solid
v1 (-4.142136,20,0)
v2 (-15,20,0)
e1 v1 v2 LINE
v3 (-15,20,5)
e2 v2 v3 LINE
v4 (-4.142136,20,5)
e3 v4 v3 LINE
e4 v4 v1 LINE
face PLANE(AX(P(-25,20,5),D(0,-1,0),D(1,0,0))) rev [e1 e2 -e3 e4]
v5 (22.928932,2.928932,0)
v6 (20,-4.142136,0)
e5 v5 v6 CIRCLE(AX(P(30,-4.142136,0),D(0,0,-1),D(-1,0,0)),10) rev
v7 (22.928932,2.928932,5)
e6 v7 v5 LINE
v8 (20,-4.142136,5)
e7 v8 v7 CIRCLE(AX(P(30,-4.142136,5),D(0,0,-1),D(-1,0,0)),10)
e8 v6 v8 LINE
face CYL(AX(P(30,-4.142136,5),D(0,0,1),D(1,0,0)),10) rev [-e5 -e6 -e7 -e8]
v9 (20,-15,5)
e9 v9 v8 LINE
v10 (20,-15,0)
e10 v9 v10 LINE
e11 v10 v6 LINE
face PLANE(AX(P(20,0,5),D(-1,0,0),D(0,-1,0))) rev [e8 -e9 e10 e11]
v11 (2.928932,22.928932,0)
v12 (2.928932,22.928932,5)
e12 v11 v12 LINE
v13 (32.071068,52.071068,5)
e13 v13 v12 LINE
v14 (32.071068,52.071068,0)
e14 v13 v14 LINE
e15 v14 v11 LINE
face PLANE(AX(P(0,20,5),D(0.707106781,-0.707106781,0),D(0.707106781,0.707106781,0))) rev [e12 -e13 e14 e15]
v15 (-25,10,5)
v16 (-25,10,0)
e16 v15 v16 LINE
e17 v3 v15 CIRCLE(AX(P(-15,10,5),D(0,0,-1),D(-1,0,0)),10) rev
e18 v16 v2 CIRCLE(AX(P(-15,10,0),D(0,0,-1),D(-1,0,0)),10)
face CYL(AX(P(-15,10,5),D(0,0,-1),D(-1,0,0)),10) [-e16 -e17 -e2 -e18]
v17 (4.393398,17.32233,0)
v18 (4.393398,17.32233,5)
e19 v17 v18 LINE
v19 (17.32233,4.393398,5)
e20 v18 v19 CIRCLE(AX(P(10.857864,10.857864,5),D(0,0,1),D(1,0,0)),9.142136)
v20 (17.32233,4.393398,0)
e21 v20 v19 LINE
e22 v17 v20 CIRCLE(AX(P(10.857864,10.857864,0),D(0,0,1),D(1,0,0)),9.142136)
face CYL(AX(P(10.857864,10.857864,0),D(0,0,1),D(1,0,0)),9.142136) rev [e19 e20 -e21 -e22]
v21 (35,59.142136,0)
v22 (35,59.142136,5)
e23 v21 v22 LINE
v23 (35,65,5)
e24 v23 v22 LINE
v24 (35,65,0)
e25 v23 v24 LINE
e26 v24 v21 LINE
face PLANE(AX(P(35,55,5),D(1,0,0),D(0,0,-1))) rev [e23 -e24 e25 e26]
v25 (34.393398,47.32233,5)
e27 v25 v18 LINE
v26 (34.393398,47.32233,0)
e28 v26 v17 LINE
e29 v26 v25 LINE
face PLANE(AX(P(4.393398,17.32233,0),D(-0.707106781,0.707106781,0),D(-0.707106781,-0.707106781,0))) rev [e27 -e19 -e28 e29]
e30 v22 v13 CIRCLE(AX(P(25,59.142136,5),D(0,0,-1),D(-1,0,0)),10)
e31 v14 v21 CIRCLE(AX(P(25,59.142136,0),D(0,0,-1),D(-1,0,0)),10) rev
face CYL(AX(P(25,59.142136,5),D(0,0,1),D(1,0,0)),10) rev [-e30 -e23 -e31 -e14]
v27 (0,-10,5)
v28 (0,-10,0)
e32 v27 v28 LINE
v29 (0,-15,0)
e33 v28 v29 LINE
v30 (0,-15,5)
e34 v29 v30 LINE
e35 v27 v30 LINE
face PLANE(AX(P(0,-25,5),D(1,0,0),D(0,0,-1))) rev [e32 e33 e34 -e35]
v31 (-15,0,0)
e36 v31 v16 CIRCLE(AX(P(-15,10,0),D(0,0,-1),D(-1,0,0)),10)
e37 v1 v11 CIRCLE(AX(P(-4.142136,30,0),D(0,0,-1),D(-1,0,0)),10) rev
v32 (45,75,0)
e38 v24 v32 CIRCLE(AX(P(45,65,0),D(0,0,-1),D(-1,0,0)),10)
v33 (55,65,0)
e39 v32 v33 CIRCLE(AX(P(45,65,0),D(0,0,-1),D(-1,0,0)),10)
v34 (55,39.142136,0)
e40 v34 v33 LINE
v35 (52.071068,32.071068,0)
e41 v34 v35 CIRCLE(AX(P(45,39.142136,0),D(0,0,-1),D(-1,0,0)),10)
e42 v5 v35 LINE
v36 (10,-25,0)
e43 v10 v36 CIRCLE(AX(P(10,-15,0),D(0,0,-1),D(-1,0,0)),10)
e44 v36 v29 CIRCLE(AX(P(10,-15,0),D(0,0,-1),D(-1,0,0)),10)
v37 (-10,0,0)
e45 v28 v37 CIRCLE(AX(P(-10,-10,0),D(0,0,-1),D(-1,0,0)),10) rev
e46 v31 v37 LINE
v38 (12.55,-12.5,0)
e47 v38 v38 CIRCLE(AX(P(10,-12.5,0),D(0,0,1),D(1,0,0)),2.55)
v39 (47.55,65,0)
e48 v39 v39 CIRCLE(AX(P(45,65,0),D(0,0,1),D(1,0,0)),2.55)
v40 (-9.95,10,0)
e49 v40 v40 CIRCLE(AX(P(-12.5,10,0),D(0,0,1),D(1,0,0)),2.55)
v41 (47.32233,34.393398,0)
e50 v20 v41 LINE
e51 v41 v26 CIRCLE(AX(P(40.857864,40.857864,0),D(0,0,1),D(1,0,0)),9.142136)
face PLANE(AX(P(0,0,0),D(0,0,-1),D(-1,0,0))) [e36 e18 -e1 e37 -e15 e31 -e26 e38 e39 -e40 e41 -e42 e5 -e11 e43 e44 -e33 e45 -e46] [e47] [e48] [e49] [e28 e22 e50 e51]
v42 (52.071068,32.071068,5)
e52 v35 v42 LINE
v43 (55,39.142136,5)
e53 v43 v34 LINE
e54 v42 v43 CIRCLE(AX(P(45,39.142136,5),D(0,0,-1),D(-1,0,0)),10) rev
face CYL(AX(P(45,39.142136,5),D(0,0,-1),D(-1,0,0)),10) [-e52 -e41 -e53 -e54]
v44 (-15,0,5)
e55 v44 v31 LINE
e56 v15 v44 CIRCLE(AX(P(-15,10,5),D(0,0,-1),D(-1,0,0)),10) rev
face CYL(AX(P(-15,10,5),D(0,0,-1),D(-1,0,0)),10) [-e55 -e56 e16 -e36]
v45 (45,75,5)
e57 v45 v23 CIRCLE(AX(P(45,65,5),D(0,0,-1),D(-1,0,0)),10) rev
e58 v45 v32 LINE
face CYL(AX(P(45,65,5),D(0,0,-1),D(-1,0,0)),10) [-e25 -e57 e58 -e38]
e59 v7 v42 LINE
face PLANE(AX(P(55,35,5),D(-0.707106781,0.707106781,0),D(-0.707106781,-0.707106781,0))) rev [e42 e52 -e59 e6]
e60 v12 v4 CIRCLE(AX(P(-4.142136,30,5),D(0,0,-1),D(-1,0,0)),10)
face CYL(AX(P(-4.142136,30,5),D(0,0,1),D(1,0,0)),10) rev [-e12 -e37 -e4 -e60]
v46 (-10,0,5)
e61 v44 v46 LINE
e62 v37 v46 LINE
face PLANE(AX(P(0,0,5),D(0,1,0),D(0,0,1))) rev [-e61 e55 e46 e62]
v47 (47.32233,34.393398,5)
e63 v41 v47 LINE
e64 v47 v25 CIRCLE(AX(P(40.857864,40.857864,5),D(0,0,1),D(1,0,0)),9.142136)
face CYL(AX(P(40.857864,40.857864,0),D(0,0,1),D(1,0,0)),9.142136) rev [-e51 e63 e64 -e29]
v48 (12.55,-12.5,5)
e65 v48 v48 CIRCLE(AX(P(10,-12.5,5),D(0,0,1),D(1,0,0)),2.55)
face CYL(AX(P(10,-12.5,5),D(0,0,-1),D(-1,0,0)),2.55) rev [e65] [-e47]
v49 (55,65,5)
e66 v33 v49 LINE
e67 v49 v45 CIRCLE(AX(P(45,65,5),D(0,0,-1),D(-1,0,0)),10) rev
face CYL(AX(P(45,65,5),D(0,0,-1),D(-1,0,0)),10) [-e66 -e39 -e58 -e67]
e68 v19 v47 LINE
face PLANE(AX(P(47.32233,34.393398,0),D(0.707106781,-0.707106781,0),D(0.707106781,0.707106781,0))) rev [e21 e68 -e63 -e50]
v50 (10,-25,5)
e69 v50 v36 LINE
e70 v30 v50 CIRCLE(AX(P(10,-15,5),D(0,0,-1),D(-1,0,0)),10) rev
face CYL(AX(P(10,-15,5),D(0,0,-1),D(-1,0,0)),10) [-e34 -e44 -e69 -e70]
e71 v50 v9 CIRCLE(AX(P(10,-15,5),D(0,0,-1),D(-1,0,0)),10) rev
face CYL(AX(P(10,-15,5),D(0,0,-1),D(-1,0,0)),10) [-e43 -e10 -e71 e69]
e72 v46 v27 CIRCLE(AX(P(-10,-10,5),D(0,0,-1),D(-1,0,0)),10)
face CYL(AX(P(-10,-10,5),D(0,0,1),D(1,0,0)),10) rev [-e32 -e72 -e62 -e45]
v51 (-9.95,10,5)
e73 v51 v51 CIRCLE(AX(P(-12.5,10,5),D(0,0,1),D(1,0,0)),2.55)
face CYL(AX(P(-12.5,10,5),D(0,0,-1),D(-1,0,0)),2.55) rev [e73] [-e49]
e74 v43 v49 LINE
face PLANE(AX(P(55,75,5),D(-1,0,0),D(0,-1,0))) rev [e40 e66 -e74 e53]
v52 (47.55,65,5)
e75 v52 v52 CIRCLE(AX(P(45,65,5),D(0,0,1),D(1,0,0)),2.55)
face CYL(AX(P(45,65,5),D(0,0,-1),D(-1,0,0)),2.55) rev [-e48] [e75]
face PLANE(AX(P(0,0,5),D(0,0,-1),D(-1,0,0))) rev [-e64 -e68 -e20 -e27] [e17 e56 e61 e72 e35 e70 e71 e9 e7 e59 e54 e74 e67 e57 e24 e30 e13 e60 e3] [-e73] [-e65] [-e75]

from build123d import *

# Parameters (mm, degrees)
SKETCH_1_R          = 2.55
EXTRUDE_1_DEPTH     = 5
FILLET_1_R          = 10
CUT_EXTRUDE_1_DEPTH = 94.139680051


with BuildPart() as part:
    # ｽｹｯﾁ1 → ﾎﾞｽ - 押し出し1 (new body)
    with BuildSketch(Plane.XY):
        Polygon((0, -25), (0, 0), (-25, 0), (-25, 20), (0, 20), (35, 55), (35, 75), (55, 75), (55, 35), (20, 0), (20, -25), align=None)
        with Locations((-12.5, 10)):
            Circle(SKETCH_1_R, mode=Mode.SUBTRACT)
        with Locations((10, -12.5)):
            Circle(SKETCH_1_R, mode=Mode.SUBTRACT)
        with Locations((45, 65)):
            Circle(SKETCH_1_R, mode=Mode.SUBTRACT)
    extrude(amount=EXTRUDE_1_DEPTH)

    # ﾌｨﾚｯﾄ1
    fillet_1_edges = [part.edges().sort_by_distance(p)[0] for p in [
        (35, 75, 2.5),
        (55, 75, 2.5),
        (20, 0, 2.5),
        (20, -25, 2.5),
        (0, -25, 2.5),
        (0, 0, 2.5),
        (-25, 0, 2.5),
        (-25, 20, 2.5),
        (0, 20, 2.5),
        (35, 55, 2.5),
        (55, 35, 2.5),
    ]]
    fillet(fillet_1_edges, radius=FILLET_1_R - 0.0001)  # a hair under: the kernel refuses the full size

    # ｽｹｯﾁ2 → ｶｯﾄ - 押し出し1 (cut, through all)
    with BuildSketch(Plane.XY.offset(5)):
        with BuildLine():
            Line((4.393398282, 17.32233047), (34.393398282, 47.32233047))
            ThreePointArc((34.393398282, 47.32233047), (47.32233047, 47.32233047), (47.32233047, 34.393398282))
            Line((47.32233047, 34.393398282), (17.32233047, 4.393398282))
            ThreePointArc((17.32233047, 4.393398282), (4.393398282, 4.393398282), (4.393398282, 17.32233047))
        make_face()
    extrude(amount=-CUT_EXTRUDE_1_DEPTH, mode=Mode.SUBTRACT)


solid = part.part
